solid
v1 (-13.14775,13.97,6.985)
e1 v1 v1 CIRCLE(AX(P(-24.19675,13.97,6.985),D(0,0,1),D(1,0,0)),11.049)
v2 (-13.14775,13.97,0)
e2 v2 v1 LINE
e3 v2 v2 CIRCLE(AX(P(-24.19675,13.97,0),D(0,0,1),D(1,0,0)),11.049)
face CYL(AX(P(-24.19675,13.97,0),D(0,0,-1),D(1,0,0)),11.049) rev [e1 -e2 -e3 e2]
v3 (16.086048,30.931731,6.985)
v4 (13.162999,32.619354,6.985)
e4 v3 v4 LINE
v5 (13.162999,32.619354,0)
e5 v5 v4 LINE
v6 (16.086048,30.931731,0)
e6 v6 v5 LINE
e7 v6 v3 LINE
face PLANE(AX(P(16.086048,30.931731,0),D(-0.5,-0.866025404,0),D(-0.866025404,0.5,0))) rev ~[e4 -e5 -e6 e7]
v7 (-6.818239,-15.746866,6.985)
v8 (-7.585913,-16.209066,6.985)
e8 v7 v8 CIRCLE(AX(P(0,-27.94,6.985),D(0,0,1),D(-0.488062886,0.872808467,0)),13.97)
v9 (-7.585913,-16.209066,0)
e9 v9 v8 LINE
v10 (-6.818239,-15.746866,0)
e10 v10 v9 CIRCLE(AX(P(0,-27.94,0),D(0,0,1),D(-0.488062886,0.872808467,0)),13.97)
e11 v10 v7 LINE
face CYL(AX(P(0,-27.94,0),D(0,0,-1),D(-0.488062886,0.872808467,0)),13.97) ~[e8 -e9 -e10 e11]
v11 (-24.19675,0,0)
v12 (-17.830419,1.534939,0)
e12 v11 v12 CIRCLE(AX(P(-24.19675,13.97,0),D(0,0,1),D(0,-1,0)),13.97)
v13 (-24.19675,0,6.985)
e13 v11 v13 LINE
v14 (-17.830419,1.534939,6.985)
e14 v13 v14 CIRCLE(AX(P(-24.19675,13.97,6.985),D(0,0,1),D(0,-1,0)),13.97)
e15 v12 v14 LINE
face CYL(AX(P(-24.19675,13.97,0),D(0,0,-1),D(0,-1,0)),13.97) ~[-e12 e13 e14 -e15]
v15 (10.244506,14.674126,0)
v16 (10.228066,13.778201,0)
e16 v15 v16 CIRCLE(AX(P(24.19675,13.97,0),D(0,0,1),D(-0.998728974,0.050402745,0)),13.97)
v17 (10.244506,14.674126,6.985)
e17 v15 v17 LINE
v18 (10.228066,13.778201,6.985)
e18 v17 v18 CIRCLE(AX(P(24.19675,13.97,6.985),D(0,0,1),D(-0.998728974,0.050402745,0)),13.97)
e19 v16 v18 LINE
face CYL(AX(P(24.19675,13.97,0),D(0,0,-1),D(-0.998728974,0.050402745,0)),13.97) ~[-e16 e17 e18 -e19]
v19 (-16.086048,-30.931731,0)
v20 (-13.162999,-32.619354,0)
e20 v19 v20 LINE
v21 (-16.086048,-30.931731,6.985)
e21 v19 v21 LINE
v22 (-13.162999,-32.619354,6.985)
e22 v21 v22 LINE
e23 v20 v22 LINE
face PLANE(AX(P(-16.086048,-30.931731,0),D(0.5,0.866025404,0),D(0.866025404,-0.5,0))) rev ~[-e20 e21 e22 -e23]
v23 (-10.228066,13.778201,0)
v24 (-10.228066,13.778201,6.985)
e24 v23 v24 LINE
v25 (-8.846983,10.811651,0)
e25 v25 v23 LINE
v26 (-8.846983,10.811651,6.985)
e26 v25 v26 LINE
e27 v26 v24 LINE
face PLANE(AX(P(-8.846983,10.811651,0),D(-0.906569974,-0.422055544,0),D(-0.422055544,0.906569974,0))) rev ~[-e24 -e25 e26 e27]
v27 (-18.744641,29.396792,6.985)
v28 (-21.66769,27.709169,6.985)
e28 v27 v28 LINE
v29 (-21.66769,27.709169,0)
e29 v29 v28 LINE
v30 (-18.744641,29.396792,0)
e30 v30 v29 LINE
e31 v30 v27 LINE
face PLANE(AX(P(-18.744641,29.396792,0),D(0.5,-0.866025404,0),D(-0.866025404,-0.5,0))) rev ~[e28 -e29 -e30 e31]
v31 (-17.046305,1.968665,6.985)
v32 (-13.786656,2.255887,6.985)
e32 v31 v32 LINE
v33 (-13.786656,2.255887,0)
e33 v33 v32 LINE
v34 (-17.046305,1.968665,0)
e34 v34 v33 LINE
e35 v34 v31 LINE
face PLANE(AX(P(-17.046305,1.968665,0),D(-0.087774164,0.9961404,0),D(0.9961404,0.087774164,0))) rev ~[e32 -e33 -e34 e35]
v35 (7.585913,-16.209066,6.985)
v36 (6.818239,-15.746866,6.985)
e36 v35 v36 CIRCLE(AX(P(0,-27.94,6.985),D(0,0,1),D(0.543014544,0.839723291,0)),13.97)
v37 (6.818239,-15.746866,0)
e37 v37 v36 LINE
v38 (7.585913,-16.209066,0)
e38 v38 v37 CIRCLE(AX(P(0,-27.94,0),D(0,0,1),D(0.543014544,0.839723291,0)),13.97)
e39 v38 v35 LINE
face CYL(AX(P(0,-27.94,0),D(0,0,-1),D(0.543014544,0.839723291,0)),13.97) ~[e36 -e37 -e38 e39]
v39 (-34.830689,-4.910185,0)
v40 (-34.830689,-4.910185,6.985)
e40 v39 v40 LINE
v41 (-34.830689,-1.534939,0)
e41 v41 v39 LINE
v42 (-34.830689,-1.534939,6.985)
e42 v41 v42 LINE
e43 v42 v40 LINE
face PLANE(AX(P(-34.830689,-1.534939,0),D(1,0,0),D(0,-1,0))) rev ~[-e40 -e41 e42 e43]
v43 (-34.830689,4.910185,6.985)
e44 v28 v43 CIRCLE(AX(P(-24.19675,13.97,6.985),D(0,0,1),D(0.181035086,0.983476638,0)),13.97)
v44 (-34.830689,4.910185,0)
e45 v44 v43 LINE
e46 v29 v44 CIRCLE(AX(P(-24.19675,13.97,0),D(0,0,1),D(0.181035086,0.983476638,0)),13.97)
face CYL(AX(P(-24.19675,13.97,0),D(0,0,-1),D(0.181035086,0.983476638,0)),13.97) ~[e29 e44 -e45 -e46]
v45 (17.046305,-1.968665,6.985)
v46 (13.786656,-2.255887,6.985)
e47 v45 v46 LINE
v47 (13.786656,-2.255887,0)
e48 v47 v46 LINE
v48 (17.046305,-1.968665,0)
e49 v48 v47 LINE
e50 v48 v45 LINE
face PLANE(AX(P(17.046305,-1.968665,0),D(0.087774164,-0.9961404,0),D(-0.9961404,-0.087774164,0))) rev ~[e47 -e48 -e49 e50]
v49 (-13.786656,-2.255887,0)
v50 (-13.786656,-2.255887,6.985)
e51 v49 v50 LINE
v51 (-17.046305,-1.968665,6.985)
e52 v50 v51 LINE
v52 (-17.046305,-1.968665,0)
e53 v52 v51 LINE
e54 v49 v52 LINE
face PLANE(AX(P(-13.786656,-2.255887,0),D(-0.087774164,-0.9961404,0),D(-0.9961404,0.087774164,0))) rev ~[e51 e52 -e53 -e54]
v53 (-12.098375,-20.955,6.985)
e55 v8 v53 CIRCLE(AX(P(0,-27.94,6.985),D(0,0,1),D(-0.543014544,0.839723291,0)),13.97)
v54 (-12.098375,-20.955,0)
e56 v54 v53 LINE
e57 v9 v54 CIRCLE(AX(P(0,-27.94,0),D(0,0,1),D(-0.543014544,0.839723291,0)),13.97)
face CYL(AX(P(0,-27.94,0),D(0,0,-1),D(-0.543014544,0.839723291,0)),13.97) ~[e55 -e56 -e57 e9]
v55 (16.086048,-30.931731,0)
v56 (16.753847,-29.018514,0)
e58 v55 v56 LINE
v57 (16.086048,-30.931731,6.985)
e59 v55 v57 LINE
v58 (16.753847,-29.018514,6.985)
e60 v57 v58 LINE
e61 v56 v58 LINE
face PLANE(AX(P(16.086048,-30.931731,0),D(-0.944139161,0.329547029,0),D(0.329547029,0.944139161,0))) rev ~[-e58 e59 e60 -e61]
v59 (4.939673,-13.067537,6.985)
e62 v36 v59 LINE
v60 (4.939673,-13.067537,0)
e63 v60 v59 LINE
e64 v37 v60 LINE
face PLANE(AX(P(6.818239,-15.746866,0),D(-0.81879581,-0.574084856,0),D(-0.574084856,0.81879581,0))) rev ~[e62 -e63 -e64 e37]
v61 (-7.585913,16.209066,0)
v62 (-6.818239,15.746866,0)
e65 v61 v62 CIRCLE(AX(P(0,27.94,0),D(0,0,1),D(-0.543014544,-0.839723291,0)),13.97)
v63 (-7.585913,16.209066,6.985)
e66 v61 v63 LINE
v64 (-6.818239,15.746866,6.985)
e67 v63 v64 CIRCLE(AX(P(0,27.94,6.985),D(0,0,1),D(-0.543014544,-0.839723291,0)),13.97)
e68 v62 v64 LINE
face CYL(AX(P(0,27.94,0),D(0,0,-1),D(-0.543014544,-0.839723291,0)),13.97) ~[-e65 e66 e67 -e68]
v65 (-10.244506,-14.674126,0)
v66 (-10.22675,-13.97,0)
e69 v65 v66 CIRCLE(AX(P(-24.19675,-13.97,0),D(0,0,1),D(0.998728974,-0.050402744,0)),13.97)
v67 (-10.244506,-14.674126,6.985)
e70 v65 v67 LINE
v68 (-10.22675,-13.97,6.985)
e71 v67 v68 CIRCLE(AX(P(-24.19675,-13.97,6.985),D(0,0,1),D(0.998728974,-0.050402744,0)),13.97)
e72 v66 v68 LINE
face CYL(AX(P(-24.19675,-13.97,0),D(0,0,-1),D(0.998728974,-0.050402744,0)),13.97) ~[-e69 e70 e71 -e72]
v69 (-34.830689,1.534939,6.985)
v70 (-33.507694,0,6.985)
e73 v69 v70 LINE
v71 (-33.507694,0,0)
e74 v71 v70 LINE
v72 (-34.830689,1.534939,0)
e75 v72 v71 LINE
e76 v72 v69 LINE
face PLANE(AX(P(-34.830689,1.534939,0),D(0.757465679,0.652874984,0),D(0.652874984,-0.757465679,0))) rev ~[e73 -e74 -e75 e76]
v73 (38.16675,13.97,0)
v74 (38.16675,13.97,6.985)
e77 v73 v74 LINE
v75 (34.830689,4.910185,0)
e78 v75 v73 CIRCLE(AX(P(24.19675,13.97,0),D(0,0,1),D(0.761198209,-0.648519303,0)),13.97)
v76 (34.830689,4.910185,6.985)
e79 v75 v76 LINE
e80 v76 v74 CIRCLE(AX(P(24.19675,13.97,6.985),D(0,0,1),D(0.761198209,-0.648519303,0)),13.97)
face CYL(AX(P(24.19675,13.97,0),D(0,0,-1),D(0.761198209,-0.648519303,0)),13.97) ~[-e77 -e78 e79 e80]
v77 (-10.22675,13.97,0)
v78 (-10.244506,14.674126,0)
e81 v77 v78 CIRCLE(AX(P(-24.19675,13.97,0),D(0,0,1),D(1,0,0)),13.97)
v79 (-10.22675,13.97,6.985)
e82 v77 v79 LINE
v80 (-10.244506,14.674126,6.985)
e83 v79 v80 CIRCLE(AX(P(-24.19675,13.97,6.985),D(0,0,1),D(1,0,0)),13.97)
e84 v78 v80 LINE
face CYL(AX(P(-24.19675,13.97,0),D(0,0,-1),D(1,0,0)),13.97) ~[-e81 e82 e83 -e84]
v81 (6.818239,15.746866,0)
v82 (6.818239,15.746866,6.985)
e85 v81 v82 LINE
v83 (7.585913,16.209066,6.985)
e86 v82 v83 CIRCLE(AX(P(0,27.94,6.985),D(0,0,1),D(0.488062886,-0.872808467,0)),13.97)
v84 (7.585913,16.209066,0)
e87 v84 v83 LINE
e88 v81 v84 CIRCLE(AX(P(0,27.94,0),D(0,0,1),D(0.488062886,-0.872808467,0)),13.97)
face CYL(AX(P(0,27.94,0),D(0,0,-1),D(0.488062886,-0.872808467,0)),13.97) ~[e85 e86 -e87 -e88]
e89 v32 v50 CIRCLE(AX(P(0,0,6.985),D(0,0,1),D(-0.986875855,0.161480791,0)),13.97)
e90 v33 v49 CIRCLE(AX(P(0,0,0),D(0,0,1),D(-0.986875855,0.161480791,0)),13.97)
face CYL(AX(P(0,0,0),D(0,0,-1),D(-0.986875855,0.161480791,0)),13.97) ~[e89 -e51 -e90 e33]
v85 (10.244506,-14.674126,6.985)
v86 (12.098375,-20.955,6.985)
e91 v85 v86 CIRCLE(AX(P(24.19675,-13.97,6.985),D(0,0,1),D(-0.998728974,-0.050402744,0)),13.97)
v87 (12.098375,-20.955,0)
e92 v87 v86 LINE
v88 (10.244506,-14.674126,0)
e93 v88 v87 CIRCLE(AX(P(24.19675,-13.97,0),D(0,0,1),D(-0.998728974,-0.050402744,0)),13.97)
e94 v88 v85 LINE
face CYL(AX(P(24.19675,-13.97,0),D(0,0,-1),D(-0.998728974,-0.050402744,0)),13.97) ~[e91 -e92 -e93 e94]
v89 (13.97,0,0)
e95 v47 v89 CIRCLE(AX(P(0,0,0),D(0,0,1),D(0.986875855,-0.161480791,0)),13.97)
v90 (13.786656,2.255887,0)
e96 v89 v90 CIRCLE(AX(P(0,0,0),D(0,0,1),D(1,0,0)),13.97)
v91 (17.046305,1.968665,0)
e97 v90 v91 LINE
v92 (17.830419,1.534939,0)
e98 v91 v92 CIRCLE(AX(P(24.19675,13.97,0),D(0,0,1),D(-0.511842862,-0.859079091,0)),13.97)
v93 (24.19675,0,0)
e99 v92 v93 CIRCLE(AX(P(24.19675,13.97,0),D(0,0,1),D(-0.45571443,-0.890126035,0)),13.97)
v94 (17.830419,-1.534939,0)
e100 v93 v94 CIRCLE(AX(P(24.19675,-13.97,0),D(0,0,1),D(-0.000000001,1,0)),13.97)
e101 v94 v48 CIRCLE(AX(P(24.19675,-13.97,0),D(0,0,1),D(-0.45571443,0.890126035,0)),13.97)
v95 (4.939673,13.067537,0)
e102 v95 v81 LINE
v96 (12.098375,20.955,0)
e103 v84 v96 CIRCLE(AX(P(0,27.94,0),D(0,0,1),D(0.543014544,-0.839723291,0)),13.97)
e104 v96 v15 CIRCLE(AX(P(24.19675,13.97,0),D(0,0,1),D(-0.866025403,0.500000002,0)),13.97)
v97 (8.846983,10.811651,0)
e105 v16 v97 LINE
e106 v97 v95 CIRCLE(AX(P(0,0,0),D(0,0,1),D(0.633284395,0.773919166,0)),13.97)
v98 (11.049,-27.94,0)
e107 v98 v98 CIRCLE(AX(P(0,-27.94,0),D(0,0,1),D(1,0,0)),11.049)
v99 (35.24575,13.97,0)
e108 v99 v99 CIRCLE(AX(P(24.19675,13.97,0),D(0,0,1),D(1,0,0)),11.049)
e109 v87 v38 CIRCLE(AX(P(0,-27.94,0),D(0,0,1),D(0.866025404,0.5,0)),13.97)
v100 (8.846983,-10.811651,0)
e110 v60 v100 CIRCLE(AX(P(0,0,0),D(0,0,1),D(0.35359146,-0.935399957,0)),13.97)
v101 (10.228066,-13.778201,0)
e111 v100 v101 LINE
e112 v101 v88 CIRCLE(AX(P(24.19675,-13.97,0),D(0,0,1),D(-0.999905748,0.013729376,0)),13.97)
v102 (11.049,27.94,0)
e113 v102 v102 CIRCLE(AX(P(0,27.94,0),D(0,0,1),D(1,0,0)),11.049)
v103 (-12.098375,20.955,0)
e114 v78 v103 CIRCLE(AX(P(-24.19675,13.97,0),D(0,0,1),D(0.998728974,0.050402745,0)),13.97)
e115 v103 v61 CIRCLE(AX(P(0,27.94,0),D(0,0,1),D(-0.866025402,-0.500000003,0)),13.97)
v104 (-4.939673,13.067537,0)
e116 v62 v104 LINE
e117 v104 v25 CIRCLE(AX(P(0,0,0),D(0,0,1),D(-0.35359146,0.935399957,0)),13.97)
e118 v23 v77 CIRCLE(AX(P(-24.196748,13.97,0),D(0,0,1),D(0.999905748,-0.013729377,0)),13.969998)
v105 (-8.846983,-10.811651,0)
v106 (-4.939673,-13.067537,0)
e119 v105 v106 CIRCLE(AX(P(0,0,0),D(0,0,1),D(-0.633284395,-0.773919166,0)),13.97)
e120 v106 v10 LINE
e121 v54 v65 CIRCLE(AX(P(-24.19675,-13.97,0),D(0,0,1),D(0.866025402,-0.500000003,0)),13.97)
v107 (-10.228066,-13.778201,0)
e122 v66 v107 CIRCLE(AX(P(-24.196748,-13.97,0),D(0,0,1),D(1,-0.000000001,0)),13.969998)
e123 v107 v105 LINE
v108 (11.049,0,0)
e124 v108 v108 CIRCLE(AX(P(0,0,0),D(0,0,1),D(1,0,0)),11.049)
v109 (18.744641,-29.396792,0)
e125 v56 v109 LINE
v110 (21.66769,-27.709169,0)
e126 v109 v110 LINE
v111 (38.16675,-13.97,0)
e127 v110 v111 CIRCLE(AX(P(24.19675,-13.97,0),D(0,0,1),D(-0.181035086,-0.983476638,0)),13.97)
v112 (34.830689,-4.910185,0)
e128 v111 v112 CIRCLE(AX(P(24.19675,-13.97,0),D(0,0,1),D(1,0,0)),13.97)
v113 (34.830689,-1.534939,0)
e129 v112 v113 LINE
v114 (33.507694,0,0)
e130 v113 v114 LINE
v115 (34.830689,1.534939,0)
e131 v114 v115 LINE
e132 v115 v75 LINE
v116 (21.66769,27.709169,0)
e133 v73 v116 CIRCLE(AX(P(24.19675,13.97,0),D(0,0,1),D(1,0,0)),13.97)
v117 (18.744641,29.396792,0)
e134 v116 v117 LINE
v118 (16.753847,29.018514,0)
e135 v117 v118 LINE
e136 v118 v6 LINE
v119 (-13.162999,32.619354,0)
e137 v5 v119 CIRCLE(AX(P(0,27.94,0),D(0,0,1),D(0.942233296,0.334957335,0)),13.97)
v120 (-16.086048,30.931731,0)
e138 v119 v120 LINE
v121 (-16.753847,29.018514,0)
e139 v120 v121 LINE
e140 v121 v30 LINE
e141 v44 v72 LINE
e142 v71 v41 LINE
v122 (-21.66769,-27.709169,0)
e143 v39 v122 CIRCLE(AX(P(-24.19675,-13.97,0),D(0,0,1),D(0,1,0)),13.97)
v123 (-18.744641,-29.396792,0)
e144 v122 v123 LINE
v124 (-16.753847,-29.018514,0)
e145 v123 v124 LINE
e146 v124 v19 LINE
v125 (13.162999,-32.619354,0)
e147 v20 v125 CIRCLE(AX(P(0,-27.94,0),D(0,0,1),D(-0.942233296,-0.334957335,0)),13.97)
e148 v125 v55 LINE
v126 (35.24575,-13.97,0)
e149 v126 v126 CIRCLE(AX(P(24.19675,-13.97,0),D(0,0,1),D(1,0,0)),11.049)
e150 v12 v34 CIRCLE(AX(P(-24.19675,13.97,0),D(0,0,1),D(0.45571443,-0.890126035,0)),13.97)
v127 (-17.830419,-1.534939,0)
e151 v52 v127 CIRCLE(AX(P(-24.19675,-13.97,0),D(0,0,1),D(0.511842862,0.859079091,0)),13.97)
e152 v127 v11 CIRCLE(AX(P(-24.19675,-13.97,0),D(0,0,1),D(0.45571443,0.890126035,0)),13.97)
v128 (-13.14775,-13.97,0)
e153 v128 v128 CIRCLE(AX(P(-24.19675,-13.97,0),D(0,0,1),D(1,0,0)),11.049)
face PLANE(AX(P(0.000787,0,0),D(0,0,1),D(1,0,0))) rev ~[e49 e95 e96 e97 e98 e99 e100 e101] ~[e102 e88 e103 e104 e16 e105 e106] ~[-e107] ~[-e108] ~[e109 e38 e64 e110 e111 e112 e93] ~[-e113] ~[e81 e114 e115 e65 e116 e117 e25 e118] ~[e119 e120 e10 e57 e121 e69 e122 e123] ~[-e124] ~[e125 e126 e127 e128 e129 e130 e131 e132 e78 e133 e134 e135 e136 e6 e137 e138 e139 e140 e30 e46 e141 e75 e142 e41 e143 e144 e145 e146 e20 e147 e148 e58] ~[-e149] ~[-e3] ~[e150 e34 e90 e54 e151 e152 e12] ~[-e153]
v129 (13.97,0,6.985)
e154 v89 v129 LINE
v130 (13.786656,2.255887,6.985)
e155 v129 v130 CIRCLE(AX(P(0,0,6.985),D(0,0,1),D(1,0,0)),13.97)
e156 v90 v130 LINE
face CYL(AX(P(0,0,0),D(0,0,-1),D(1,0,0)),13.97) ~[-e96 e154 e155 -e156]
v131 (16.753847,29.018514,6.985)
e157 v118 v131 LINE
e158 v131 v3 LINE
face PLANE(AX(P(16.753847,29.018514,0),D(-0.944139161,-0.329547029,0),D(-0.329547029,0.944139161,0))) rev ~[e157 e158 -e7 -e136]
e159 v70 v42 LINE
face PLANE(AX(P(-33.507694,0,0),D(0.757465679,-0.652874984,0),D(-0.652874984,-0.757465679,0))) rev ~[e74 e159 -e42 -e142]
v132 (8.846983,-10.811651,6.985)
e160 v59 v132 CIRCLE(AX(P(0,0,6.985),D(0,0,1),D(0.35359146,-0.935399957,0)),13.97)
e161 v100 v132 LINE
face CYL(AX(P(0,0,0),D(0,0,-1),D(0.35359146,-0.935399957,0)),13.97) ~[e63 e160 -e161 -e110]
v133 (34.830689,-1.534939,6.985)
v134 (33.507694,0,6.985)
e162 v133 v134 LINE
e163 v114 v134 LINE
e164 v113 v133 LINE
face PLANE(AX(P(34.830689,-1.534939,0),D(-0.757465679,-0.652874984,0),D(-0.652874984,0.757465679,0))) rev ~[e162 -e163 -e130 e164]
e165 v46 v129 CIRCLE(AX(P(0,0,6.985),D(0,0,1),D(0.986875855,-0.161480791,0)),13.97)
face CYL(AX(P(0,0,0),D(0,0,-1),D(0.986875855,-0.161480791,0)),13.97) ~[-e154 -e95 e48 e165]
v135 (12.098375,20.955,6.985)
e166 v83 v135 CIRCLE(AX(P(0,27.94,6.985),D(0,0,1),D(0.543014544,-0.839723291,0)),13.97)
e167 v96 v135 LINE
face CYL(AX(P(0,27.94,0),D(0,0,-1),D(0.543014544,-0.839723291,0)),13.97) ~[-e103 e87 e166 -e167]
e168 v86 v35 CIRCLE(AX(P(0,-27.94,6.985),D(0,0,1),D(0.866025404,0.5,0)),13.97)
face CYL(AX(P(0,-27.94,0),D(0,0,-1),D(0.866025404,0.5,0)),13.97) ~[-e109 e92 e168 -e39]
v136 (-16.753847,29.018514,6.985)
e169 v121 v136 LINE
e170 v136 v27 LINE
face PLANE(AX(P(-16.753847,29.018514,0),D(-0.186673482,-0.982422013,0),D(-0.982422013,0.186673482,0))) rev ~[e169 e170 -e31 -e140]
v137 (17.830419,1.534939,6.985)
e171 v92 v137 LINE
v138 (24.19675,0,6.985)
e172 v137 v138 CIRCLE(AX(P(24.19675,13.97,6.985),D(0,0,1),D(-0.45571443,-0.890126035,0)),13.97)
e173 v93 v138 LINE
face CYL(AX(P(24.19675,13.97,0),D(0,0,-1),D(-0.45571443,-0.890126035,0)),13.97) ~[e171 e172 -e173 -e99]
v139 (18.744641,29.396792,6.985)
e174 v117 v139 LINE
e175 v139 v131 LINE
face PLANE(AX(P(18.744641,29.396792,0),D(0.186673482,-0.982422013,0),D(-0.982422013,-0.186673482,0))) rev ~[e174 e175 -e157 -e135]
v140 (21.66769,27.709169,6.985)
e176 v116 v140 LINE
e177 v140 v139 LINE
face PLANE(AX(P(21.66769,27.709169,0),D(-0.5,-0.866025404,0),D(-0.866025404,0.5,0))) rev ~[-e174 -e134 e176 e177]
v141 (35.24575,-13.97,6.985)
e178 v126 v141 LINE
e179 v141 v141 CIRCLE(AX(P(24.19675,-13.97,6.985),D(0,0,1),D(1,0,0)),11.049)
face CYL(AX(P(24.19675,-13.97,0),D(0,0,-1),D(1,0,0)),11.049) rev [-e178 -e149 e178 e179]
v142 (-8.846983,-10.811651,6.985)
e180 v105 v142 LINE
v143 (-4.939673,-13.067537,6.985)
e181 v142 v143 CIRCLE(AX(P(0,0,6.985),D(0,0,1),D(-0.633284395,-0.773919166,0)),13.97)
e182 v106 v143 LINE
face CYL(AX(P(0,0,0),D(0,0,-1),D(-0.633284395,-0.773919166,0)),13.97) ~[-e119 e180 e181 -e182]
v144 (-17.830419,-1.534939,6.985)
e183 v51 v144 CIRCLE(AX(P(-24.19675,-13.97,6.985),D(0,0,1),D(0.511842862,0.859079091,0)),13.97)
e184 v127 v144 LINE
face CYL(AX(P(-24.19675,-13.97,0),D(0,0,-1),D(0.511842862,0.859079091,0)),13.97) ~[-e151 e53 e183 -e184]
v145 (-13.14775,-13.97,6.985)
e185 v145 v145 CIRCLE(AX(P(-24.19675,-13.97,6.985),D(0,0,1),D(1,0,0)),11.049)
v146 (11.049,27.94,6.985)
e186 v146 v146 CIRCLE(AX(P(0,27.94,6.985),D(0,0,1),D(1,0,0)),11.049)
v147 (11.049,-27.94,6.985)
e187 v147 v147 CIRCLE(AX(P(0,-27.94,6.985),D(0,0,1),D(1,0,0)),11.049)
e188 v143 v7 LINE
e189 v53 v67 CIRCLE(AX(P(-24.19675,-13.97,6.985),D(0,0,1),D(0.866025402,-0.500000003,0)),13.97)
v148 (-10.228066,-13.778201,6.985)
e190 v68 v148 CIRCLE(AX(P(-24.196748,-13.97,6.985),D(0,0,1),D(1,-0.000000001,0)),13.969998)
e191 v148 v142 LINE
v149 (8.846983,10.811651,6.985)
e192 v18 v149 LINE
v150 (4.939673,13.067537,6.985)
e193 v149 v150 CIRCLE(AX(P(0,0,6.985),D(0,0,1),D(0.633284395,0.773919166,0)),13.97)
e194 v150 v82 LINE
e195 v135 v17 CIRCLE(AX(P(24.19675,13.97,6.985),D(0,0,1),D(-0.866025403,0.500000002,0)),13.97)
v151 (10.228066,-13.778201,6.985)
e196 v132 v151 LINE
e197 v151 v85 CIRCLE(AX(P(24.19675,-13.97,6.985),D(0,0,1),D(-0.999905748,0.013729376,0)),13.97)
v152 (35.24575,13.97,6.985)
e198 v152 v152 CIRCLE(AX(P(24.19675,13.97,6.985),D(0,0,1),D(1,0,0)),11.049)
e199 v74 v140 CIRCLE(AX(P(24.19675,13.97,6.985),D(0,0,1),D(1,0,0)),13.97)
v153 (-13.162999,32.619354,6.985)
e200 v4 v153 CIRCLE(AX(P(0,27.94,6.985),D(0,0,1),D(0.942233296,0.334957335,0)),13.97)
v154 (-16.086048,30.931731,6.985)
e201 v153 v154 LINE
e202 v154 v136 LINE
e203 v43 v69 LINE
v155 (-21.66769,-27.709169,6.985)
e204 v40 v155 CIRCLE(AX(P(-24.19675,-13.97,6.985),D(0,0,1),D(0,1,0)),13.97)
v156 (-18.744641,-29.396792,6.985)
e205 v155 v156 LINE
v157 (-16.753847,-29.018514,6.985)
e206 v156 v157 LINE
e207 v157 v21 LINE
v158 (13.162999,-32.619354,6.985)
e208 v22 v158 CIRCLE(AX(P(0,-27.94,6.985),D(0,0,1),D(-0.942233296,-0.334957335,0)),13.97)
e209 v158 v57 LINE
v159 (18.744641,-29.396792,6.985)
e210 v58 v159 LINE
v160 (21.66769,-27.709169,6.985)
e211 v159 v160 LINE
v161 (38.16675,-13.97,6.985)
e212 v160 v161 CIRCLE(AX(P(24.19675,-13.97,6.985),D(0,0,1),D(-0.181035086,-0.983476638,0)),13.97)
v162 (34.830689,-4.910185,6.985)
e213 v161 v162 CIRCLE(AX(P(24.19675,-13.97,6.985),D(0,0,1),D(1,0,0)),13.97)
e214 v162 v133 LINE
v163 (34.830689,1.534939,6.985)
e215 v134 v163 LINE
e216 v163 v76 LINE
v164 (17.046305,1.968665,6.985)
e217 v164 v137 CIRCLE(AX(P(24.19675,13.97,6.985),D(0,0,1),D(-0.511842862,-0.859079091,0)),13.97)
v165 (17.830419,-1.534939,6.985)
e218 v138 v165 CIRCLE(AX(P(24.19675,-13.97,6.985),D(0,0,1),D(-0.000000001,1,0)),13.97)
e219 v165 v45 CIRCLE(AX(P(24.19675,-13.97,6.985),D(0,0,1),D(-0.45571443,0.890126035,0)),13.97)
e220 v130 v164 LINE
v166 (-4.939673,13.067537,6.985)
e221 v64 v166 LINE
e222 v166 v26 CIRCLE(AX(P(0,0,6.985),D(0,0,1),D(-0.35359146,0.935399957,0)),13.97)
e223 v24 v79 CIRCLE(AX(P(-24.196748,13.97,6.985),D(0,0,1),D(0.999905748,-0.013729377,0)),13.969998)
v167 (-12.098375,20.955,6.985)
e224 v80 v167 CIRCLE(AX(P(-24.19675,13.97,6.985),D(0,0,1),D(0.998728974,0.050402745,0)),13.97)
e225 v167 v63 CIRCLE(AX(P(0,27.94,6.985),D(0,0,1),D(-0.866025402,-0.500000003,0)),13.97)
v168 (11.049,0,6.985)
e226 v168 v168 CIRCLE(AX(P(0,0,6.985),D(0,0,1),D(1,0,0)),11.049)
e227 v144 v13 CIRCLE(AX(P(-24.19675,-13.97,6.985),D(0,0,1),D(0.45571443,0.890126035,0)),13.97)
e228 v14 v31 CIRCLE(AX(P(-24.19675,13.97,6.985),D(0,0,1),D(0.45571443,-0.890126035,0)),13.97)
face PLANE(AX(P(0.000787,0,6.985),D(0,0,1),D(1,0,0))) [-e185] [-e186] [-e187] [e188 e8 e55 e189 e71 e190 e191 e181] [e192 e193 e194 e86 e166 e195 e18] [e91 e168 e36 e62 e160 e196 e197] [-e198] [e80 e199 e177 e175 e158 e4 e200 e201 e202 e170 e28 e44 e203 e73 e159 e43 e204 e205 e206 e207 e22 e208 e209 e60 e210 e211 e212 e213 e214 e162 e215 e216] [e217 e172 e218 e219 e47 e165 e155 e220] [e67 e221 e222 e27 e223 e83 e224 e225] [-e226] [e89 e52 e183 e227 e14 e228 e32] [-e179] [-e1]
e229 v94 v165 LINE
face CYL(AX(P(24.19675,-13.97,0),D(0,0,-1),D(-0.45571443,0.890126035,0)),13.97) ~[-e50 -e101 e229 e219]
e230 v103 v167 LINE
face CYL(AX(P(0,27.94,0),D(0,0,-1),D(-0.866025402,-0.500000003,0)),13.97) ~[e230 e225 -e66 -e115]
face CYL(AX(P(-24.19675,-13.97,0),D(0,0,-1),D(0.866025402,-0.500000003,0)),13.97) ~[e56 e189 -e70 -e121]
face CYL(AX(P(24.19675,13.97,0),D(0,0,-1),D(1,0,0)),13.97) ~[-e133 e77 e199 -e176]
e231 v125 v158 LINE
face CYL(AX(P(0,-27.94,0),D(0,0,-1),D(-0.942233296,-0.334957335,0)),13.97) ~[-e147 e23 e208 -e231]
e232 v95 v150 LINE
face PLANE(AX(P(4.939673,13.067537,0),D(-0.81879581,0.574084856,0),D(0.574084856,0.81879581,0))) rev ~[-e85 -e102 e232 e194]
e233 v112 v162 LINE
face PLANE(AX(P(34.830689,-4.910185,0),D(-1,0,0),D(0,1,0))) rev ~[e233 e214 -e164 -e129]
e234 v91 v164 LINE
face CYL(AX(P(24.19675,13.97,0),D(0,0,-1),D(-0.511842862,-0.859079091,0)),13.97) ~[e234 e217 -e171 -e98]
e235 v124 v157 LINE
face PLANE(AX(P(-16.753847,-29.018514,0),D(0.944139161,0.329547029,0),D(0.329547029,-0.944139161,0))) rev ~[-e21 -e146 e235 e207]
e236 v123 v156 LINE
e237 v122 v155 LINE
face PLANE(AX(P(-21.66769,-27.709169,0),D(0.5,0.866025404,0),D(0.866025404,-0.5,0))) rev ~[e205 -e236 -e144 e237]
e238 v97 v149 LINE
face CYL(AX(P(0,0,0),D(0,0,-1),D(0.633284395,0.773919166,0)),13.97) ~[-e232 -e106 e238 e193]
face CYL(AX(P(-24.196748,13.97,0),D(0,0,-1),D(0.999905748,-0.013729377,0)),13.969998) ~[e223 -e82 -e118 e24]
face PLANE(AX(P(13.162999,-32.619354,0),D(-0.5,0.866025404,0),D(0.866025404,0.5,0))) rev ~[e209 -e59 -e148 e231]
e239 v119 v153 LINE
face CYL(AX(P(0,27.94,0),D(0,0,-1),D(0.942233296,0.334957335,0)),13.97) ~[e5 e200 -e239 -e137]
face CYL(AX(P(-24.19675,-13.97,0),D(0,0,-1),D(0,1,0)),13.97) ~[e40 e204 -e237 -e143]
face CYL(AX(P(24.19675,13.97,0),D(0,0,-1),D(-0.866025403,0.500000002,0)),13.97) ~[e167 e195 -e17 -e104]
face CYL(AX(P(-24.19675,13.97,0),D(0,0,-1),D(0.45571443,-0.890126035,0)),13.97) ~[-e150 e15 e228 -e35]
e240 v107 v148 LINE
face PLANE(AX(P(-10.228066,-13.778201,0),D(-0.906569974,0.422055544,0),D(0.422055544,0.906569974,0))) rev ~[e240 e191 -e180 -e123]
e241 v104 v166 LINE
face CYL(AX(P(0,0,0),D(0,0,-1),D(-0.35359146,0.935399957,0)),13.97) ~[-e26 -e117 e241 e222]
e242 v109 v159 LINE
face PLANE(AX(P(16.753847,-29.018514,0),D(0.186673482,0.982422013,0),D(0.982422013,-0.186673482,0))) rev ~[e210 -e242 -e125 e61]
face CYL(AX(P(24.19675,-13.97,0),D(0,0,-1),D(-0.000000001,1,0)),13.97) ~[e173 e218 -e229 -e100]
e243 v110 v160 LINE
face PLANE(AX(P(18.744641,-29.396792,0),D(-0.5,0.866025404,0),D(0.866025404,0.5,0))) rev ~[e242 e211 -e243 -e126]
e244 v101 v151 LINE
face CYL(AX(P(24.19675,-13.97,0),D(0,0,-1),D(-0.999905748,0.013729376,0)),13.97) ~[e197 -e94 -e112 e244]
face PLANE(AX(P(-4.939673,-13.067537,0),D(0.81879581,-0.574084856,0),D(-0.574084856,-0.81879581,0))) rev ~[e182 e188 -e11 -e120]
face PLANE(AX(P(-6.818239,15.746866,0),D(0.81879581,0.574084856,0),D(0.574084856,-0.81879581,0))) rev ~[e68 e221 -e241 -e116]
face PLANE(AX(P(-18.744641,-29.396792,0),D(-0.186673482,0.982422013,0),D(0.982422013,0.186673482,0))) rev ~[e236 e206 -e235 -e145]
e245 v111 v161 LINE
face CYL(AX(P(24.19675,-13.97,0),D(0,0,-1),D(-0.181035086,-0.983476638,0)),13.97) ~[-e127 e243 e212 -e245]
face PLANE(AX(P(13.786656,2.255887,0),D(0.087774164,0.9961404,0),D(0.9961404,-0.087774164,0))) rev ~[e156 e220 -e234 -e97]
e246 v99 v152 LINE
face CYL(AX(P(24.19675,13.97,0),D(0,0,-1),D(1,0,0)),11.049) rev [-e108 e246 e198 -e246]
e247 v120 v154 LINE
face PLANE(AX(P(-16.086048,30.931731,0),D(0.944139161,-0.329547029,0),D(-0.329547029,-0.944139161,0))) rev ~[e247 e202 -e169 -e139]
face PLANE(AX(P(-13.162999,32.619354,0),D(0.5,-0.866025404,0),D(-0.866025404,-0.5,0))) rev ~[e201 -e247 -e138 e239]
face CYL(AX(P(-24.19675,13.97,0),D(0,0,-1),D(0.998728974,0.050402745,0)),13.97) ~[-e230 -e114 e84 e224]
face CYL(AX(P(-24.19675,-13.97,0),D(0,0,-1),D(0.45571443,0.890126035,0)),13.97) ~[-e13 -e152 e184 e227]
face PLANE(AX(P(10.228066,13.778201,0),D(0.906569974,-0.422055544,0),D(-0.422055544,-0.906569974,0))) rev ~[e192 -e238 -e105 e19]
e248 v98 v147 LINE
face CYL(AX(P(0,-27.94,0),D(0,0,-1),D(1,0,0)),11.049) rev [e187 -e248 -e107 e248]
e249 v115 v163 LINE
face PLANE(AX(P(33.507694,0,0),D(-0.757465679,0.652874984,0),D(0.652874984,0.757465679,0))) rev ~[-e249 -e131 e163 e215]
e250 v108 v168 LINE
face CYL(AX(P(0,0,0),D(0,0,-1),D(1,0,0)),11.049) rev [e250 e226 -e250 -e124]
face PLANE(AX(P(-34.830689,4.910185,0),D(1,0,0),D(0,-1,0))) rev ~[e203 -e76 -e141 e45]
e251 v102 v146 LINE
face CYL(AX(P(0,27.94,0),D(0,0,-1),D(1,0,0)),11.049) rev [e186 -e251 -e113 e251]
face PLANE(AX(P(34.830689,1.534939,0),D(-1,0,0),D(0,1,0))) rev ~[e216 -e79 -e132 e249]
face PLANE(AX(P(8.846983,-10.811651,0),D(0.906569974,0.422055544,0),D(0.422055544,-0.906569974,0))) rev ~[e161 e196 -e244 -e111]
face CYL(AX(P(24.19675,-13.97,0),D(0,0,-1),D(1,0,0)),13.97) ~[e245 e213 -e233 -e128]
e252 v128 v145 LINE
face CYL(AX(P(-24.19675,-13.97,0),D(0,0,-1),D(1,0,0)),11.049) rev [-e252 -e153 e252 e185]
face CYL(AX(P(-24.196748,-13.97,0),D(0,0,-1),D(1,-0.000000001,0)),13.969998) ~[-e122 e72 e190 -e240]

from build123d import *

# Parameters (mm, degrees)
F0_R     = 11.049
F1_DEPTH = 6.985


# Not quite as in the source:
# - a feature names something its author has since deleted; it is built from what else it names


with BuildPart() as f1:
    # F0 (on Top) → F1 (new body)
    with BuildSketch(Plane.XY):
        with BuildLine():
            ThreePointArc((13.786655701, -2.2558866507), (13.9240884826, -1.1316624621), (13.97, 0))
            ThreePointArc((13.97, 0), (13.9240884826, 1.1316624621), (13.786655701, 2.2558866507))
            ThreePointArc((13.786655701, 2.2558866507), (13.1567408564, 4.6969213362), (12.0983748352, 6.9850000964))
            ThreePointArc((12.0983748352, 6.9850000964), (10.6460235529, 9.0456112293), (8.8469829981, 10.811650745))
            ThreePointArc((8.8469829981, 10.811650745), (6.985, 12.0983748909), (4.9396727029, 13.0675373957))
            ThreePointArc((4.9396727029, 13.0675373957), (2.5107172862, 13.7425324707), (0, 13.97))
            ThreePointArc((0, 13.97), (-2.5107172862, 13.7425324707), (-4.9396727029, 13.0675373957))
            ThreePointArc((-4.9396727029, 13.0675373957), (-6.985, 12.0983748909), (-8.8469829981, 10.811650745))
            ThreePointArc((-8.8469829981, 10.811650745), (-10.6460236342, 9.0456111335), (-12.0983749609, 6.9849998787))
            ThreePointArc((-12.0983749609, 6.9849998787), (-13.1567408986, 4.6969212179), (-13.786655701, 2.2558866507))
            ThreePointArc((-13.786655701, 2.2558866507), (-13.97, 0), (-13.786655701, -2.2558866507))
            ThreePointArc((-13.786655701, -2.2558866507), (-13.1567408656, -4.6969213103), (-12.0983748628, -6.9850000487))
            ThreePointArc((-12.0983748628, -6.9850000487), (-10.6460235707, -9.0456112083), (-8.8469829981, -10.811650745))
            ThreePointArc((-8.8469829981, -10.811650745), (-6.985, -12.0983748909), (-4.9396727029, -13.0675373957))
            ThreePointArc((-4.9396727029, -13.0675373957), (-2.5107172928, -13.7425324695), (-1.35e-08, -13.97))
            ThreePointArc((-1.35e-08, -13.97), (2.5107172795, -13.7425324719), (4.9396727029, -13.0675373957))
            ThreePointArc((4.9396727029, -13.0675373957), (6.985, -12.0983748909), (8.8469829981, -10.811650745))
            ThreePointArc((8.8469829981, -10.811650745), (10.6460235529, -9.0456112293), (12.0983748352, -6.9850000964))
            ThreePointArc((12.0983748352, -6.9850000964), (13.1567408564, -4.6969213362), (13.786655701, -2.2558866507))
        make_face()
        Circle(F0_R, mode=Mode.SUBTRACT)
        with BuildLine():
            ThreePointArc((12.0983748352, 6.9850000964), (13.1567408564, 4.6969213362), (13.786655701, 2.2558866507))
            Line((13.786655701, 2.2558866507), (17.0463049997, 1.9686650985))
            ThreePointArc((17.0463049997, 1.9686650985), (14.2508878564, 4.1597639905), (12.0983748352, 6.9850000964))
        make_face()
        with BuildLine():
            Line((17.0463049997, -1.9686650985), (13.786655701, -2.2558866507))
            ThreePointArc((13.786655701, -2.2558866507), (13.1567408564, -4.6969213362), (12.0983748352, -6.9850000964))
            ThreePointArc((12.0983748352, -6.9850000964), (14.2508878564, -4.1597639905), (17.0463049997, -1.9686650985))
        make_face()
        with BuildLine():
            ThreePointArc((8.8469829981, 10.811650745), (10.6460235529, 9.0456112293), (12.0983748352, 6.9850000964))
            ThreePointArc((12.0983748352, 6.9850000964), (10.7279051882, 10.2617490221), (10.2280664867, 13.7782006212))
            Line((10.2280664867, 13.7782006212), (8.8469829981, 10.811650745))
        make_face()
        with BuildLine():
            ThreePointArc((10.2280664867, 13.7782006212), (10.7279051882, 10.2617490221), (12.0983748352, 6.9850000964))
            ThreePointArc((12.0983748352, 6.9850000964), (14.2508878564, 4.1597639905), (17.0463049997, 1.9686650985))
            ThreePointArc((17.0463049997, 1.9686650985), (17.4348836488, 1.7455136549), (17.8304191968, 1.5349392891))
            ThreePointArc((17.8304191968, 1.5349392891), (20.9223718291, 0.3891550696), (24.1967497683, 0))
            ThreePointArc((24.1967497683, 0), (30.0531688702, 1.2868120939), (34.8306887676, 4.9101853415))
            ThreePointArc((34.8306887676, 4.9101853415), (37.3062316104, 9.1427454817), (38.1667497817, 13.97))
            ThreePointArc((38.1667497817, 13.97), (33.1362668167, 24.7052659577), (21.6676896268, 27.7091686333))
            ThreePointArc((21.6676896268, 27.7091686333), (16.1409964163, 25.3834016715), (12.0983749062, 20.9550000265))
            ThreePointArc((12.0983749062, 20.9550000265), (10.7982040971, 17.9247279977), (10.244506016, 14.67412634))
            ThreePointArc((10.244506016, 14.67412634), (10.2291009922, 14.2262953244), (10.2280664867, 13.7782006212))
        make_face()
        with Locations((24.1967497817, 13.97)):
            Circle(F0_R, mode=Mode.SUBTRACT)
        with BuildLine():
            ThreePointArc((10.2280664867, -13.7782006212), (10.7279051882, -10.2617490221), (12.0983748352, -6.9850000964))
            ThreePointArc((12.0983748352, -6.9850000964), (10.6460235529, -9.0456112293), (8.8469829981, -10.811650745))
            Line((8.8469829981, -10.811650745), (10.2280664867, -13.7782006212))
        make_face()
        with BuildLine():
            ThreePointArc((17.0463049997, -1.9686650985), (14.2508878564, -4.1597639905), (12.0983748352, -6.9850000964))
            ThreePointArc((12.0983748352, -6.9850000964), (10.7279051882, -10.2617490221), (10.2280664867, -13.7782006212))
            ThreePointArc((10.2280664867, -13.7782006212), (10.2291009922, -14.2262953244), (10.244506016, -14.67412634))
            ThreePointArc((10.244506016, -14.67412634), (10.7982040928, -17.9247279832), (12.0983748911, -20.9550000004))
            ThreePointArc((12.0983748911, -20.9550000004), (16.140996404, -25.3834016628), (21.6676896268, -27.7091686333))
            ThreePointArc((21.6676896268, -27.7091686333), (33.1362668167, -24.7052659577), (38.1667497817, -13.97))
            ThreePointArc((38.1667497817, -13.97), (37.3062316104, -9.1427454817), (34.8306887676, -4.9101853415))
            ThreePointArc((34.8306887676, -4.9101853415), (30.0531688702, -1.2868120939), (24.1967497683, 0))
            ThreePointArc((24.1967497683, 0), (20.9223718291, -0.3891550696), (17.8304191968, -1.5349392891))
            ThreePointArc((17.8304191968, -1.5349392891), (17.4348836488, -1.7455136549), (17.0463049997, -1.9686650985))
        make_face()
        with Locations((24.1967497817, -13.97)):
            Circle(F0_R, mode=Mode.SUBTRACT)
        with BuildLine():
            ThreePointArc((0, 13.97), (2.5107172862, 13.7425324707), (4.9396727029, 13.0675373957))
            Line((4.9396727029, 13.0675373957), (6.818238513, 15.7468657196))
            ThreePointArc((6.818238513, 15.7468657196), (3.5229826925, 14.4215129194), (0, 13.97))
        make_face()
        with BuildLine():
            ThreePointArc((34.8306887676, 4.9101853415), (30.0531688702, 1.2868120939), (24.1967497683, 0))
            ThreePointArc((24.1967497683, 0), (30.0531688702, -1.2868120939), (34.8306887676, -4.9101853415))
            Line((34.8306887676, -4.9101853415), (34.8306887676, -1.5349392891))
            Line((34.8306887676, -1.5349392891), (33.5076935589, 0))
            Line((33.5076935589, 0), (34.8306887676, 1.5349392891))
            Line((34.8306887676, 1.5349392891), (34.8306887676, 4.9101853415))
        make_face()
        with BuildLine():
            Line((6.818238513, -15.7468657196), (4.9396727029, -13.0675373957))
            ThreePointArc((4.9396727029, -13.0675373957), (2.5107172795, -13.7425324719), (-1.35e-08, -13.97))
            ThreePointArc((-1.35e-08, -13.97), (3.5229826859, -14.4215129177), (6.818238513, -15.7468657196))
        make_face()
        with BuildLine():
            ThreePointArc((-4.9396727029, 13.0675373957), (-2.5107172862, 13.7425324707), (0, 13.97))
            ThreePointArc((0, 13.97), (-3.5229826925, 14.4215129194), (-6.818238513, 15.7468657196))
            Line((-6.818238513, 15.7468657196), (-4.9396727029, 13.0675373957))
        make_face()
        with BuildLine():
            ThreePointArc((-6.818238513, 15.7468657196), (-3.5229826925, 14.4215129194), (0, 13.97))
            ThreePointArc((0, 13.97), (3.5229826925, 14.4215129194), (6.818238513, 15.7468657196))
            ThreePointArc((6.818238513, 15.7468657196), (7.2057826566, 15.9718089794), (7.5859131808, 16.2090656291))
            ThreePointArc((7.5859131808, 16.2090656291), (10.1241677534, 18.3138830621), (12.0983749062, 20.9550000265))
            ThreePointArc((12.0983749062, 20.9550000265), (13.4939837972, 24.3242979547), (13.97, 27.94))
            ThreePointArc((13.97, 27.94), (13.7667715532, 30.314215871), (13.1629991407, 32.6193539748))
            ThreePointArc((13.1629991407, 32.6193539748), (0, 41.91), (-13.1629991407, 32.6193539748))
            ThreePointArc((-13.1629991407, 32.6193539748), (-13.9121724704, 26.670213737), (-12.0983748684, 20.9549999611))
            ThreePointArc((-12.0983748684, 20.9549999611), (-10.1241677273, 18.3138830348), (-7.5859131808, 16.2090656291))
            ThreePointArc((-7.5859131808, 16.2090656291), (-7.2057826566, 15.9718089794), (-6.818238513, 15.7468657196))
        make_face()
        with Locations((0, 27.94)):
            Circle(F0_R, mode=Mode.SUBTRACT)
        with BuildLine():
            ThreePointArc((13.97, 27.94), (13.4939837972, 24.3242979547), (12.0983749062, 20.9550000265))
            ThreePointArc((12.0983749062, 20.9550000265), (16.1409964163, 25.3834016715), (21.6676896268, 27.7091686333))
            Line((21.6676896268, 27.7091686333), (18.7446408014, 29.3967916595))
            Line((18.7446408014, 29.3967916595), (16.7538467795, 29.0185138443))
            Line((16.7538467795, 29.0185138443), (16.0860479661, 30.9317309486))
            Line((16.0860479661, 30.9317309486), (13.1629991407, 32.6193539748))
            ThreePointArc((13.1629991407, 32.6193539748), (13.7667715532, 30.314215871), (13.97, 27.94))
        make_face()
        with BuildLine():
            ThreePointArc((-6.818238513, -15.7468657196), (-3.522982699, -14.4215129211), (-1.35e-08, -13.97))
            ThreePointArc((-1.35e-08, -13.97), (-2.5107172928, -13.7425324695), (-4.9396727029, -13.0675373957))
            Line((-4.9396727029, -13.0675373957), (-6.818238513, -15.7468657196))
        make_face()
        with BuildLine():
            ThreePointArc((6.818238513, -15.7468657196), (3.5229826859, -14.4215129177), (-1.35e-08, -13.97))
            ThreePointArc((-1.35e-08, -13.97), (-3.522982699, -14.4215129211), (-6.818238513, -15.7468657196))
            ThreePointArc((-6.818238513, -15.7468657196), (-7.2057826566, -15.9718089794), (-7.5859131808, -16.2090656291))
            ThreePointArc((-7.5859131808, -16.2090656291), (-10.1241677569, -18.3138830658), (-12.0983749113, -20.9550000353))
            ThreePointArc((-12.0983749113, -20.9550000353), (-13.9121724743, -26.6702137797), (-13.1629991407, -32.6193539748))
            ThreePointArc((-13.1629991407, -32.6193539748), (0, -41.91), (13.1629991407, -32.6193539748))
            ThreePointArc((13.1629991407, -32.6193539748), (13.7667715532, -30.314215871), (13.97, -27.94))
            ThreePointArc((13.97, -27.94), (13.4939837933, -24.3242979401), (12.0983748911, -20.9550000004))
            ThreePointArc((12.0983748911, -20.9550000004), (10.124167743, -18.3138830512), (7.5859131808, -16.2090656291))
            ThreePointArc((7.5859131808, -16.2090656291), (7.2057826566, -15.9718089794), (6.818238513, -15.7468657196))
        make_face()
        with Locations((0, -27.94)):
            Circle(F0_R, mode=Mode.SUBTRACT)
        with BuildLine():
            ThreePointArc((21.6676896268, -27.7091686333), (16.140996404, -25.3834016628), (12.0983748911, -20.9550000004))
            ThreePointArc((12.0983748911, -20.9550000004), (13.4939837933, -24.3242979401), (13.97, -27.94))
            ThreePointArc((13.97, -27.94), (13.7667715532, -30.314215871), (13.1629991407, -32.6193539748))
            Line((13.1629991407, -32.6193539748), (16.0860479661, -30.9317309486))
            Line((16.0860479661, -30.9317309486), (16.7538467795, -29.0185138443))
            Line((16.7538467795, -29.0185138443), (18.7446408014, -29.3967916595))
            Line((18.7446408014, -29.3967916595), (21.6676896268, -27.7091686333))
        make_face()
        with BuildLine():
            ThreePointArc((-12.0983749609, 6.9849998787), (-10.6460236342, 9.0456111335), (-8.8469829981, 10.811650745))
            Line((-8.8469829981, 10.811650745), (-10.2280664867, 13.7782006212))
            ThreePointArc((-10.2280664867, 13.7782006212), (-10.7279052216, 10.261748901), (-12.0983749609, 6.9849998787))
        make_face()
        with BuildLine():
            Line((-10.2280664867, -13.7782006212), (-8.8469829981, -10.811650745))
            ThreePointArc((-8.8469829981, -10.811650745), (-10.6460235707, -9.0456112083), (-12.0983748628, -6.9850000487))
            ThreePointArc((-12.0983748628, -6.9850000487), (-10.7279051955, -10.2617489956), (-10.2280664867, -13.7782006212))
        make_face()
        with BuildLine():
            ThreePointArc((-13.786655701, 2.2558866507), (-13.1567408986, 4.6969212179), (-12.0983749609, 6.9849998787))
            ThreePointArc((-12.0983749609, 6.9849998787), (-14.2508879446, 4.1597639011), (-17.0463049997, 1.9686650985))
            Line((-17.0463049997, 1.9686650985), (-13.786655701, 2.2558866507))
        make_face()
        with BuildLine():
            ThreePointArc((-17.0463049997, 1.9686650985), (-14.2508879446, 4.1597639011), (-12.0983749609, 6.9849998787))
            ThreePointArc((-12.0983749609, 6.9849998787), (-10.7279052216, 10.261748901), (-10.2280664867, 13.7782006212))
            ThreePointArc((-10.2280664867, 13.7782006212), (-10.2270789618, 13.8740980508), (-10.2267497817, 13.97))
            ThreePointArc((-10.2267497817, 13.97), (-10.2311895458, 14.3221750937), (-10.244506016, 14.67412634))
            ThreePointArc((-10.244506016, 14.67412634), (-10.7982040864, 17.9247279614), (-12.0983748684, 20.9549999611))
            ThreePointArc((-12.0983748684, 20.9549999611), (-16.1409963854, 25.3834016497), (-21.6676896268, 27.7091686333))
            ThreePointArc((-21.6676896268, 27.7091686333), (-36.2951246726, 20.955), (-34.8306887676, 4.9101853415))
            ThreePointArc((-34.8306887676, 4.9101853415), (-30.0531688763, 1.2868120967), (-24.1967497817, 0))
            ThreePointArc((-24.1967497817, 0), (-20.9223718356, 0.3891550681), (-17.8304191968, 1.5349392891))
            ThreePointArc((-17.8304191968, 1.5349392891), (-17.4348836488, 1.7455136549), (-17.0463049997, 1.9686650985))
        make_face()
        with Locations((-24.1967497817, 13.97)):
            Circle(F0_R, mode=Mode.SUBTRACT)
        with BuildLine():
            ThreePointArc((-21.6676896268, 27.7091686333), (-16.1409963854, 25.3834016497), (-12.0983748684, 20.9549999611))
            ThreePointArc((-12.0983748684, 20.9549999611), (-13.9121724704, 26.670213737), (-13.1629991407, 32.6193539748))
            Line((-13.1629991407, 32.6193539748), (-16.0860479661, 30.9317309486))
            Line((-16.0860479661, 30.9317309486), (-16.7538467795, 29.0185138443))
            Line((-16.7538467795, 29.0185138443), (-18.7446408014, 29.3967916595))
            Line((-18.7446408014, 29.3967916595), (-21.6676896268, 27.7091686333))
        make_face()
        with BuildLine():
            ThreePointArc((-17.0463049997, -1.9686650985), (-14.2508878757, -4.1597639709), (-12.0983748628, -6.9850000487))
            ThreePointArc((-12.0983748628, -6.9850000487), (-13.1567408656, -4.6969213103), (-13.786655701, -2.2558866507))
            Line((-13.786655701, -2.2558866507), (-17.0463049997, -1.9686650985))
        make_face()
        with BuildLine():
            ThreePointArc((-10.2280664867, -13.7782006212), (-10.7279051955, -10.2617489956), (-12.0983748628, -6.9850000487))
            ThreePointArc((-12.0983748628, -6.9850000487), (-14.2508878757, -4.1597639709), (-17.0463049997, -1.9686650985))
            ThreePointArc((-17.0463049997, -1.9686650985), (-17.4348836488, -1.7455136549), (-17.8304191968, -1.5349392891))
            ThreePointArc((-17.8304191968, -1.5349392891), (-20.9223718356, -0.3891550681), (-24.1967497817, 0))
            ThreePointArc((-24.1967497817, 0), (-30.0531688763, -1.2868120967), (-34.8306887676, -4.9101853415))
            ThreePointArc((-34.8306887676, -4.9101853415), (-36.2951246726, -20.955), (-21.6676896268, -27.7091686333))
            ThreePointArc((-21.6676896268, -27.7091686333), (-16.1409964205, -25.3834016745), (-12.0983749113, -20.9550000353))
            ThreePointArc((-12.0983749113, -20.9550000353), (-10.7982040985, -17.9247280026), (-10.244506016, -14.67412634))
            ThreePointArc((-10.244506016, -14.67412634), (-10.2311895458, -14.3221750937), (-10.2267497817, -13.97))
            ThreePointArc((-10.2267497817, -13.97), (-10.2270789618, -13.8740980508), (-10.2280664867, -13.7782006212))
        make_face()
        with Locations((-24.1967497817, -13.97)):
            Circle(F0_R, mode=Mode.SUBTRACT)
        with BuildLine():
            ThreePointArc((-13.1629991407, -32.6193539748), (-13.9121724743, -26.6702137797), (-12.0983749113, -20.9550000353))
            ThreePointArc((-12.0983749113, -20.9550000353), (-16.1409964205, -25.3834016745), (-21.6676896268, -27.7091686333))
            Line((-21.6676896268, -27.7091686333), (-18.7446408014, -29.3967916595))
            Line((-18.7446408014, -29.3967916595), (-16.7538467795, -29.0185138443))
            Line((-16.7538467795, -29.0185138443), (-16.0860479661, -30.9317309486))
            Line((-16.0860479661, -30.9317309486), (-13.1629991407, -32.6193539748))
        make_face()
        with BuildLine():
            ThreePointArc((-24.1967497817, 0), (-30.0531688763, 1.2868120967), (-34.8306887676, 4.9101853415))
            Line((-34.8306887676, 4.9101853415), (-34.8306887676, 1.5349392891))
            Line((-34.8306887676, 1.5349392891), (-33.5076935589, 0))
            Line((-33.5076935589, 0), (-34.8306887676, -1.5349392891))
            Line((-34.8306887676, -1.5349392891), (-34.8306887676, -4.9101853415))
            ThreePointArc((-34.8306887676, -4.9101853415), (-30.0531688763, -1.2868120967), (-24.1967497817, 0))
        make_face()
    extrude(amount=F1_DEPTH)


solid = f1.part
